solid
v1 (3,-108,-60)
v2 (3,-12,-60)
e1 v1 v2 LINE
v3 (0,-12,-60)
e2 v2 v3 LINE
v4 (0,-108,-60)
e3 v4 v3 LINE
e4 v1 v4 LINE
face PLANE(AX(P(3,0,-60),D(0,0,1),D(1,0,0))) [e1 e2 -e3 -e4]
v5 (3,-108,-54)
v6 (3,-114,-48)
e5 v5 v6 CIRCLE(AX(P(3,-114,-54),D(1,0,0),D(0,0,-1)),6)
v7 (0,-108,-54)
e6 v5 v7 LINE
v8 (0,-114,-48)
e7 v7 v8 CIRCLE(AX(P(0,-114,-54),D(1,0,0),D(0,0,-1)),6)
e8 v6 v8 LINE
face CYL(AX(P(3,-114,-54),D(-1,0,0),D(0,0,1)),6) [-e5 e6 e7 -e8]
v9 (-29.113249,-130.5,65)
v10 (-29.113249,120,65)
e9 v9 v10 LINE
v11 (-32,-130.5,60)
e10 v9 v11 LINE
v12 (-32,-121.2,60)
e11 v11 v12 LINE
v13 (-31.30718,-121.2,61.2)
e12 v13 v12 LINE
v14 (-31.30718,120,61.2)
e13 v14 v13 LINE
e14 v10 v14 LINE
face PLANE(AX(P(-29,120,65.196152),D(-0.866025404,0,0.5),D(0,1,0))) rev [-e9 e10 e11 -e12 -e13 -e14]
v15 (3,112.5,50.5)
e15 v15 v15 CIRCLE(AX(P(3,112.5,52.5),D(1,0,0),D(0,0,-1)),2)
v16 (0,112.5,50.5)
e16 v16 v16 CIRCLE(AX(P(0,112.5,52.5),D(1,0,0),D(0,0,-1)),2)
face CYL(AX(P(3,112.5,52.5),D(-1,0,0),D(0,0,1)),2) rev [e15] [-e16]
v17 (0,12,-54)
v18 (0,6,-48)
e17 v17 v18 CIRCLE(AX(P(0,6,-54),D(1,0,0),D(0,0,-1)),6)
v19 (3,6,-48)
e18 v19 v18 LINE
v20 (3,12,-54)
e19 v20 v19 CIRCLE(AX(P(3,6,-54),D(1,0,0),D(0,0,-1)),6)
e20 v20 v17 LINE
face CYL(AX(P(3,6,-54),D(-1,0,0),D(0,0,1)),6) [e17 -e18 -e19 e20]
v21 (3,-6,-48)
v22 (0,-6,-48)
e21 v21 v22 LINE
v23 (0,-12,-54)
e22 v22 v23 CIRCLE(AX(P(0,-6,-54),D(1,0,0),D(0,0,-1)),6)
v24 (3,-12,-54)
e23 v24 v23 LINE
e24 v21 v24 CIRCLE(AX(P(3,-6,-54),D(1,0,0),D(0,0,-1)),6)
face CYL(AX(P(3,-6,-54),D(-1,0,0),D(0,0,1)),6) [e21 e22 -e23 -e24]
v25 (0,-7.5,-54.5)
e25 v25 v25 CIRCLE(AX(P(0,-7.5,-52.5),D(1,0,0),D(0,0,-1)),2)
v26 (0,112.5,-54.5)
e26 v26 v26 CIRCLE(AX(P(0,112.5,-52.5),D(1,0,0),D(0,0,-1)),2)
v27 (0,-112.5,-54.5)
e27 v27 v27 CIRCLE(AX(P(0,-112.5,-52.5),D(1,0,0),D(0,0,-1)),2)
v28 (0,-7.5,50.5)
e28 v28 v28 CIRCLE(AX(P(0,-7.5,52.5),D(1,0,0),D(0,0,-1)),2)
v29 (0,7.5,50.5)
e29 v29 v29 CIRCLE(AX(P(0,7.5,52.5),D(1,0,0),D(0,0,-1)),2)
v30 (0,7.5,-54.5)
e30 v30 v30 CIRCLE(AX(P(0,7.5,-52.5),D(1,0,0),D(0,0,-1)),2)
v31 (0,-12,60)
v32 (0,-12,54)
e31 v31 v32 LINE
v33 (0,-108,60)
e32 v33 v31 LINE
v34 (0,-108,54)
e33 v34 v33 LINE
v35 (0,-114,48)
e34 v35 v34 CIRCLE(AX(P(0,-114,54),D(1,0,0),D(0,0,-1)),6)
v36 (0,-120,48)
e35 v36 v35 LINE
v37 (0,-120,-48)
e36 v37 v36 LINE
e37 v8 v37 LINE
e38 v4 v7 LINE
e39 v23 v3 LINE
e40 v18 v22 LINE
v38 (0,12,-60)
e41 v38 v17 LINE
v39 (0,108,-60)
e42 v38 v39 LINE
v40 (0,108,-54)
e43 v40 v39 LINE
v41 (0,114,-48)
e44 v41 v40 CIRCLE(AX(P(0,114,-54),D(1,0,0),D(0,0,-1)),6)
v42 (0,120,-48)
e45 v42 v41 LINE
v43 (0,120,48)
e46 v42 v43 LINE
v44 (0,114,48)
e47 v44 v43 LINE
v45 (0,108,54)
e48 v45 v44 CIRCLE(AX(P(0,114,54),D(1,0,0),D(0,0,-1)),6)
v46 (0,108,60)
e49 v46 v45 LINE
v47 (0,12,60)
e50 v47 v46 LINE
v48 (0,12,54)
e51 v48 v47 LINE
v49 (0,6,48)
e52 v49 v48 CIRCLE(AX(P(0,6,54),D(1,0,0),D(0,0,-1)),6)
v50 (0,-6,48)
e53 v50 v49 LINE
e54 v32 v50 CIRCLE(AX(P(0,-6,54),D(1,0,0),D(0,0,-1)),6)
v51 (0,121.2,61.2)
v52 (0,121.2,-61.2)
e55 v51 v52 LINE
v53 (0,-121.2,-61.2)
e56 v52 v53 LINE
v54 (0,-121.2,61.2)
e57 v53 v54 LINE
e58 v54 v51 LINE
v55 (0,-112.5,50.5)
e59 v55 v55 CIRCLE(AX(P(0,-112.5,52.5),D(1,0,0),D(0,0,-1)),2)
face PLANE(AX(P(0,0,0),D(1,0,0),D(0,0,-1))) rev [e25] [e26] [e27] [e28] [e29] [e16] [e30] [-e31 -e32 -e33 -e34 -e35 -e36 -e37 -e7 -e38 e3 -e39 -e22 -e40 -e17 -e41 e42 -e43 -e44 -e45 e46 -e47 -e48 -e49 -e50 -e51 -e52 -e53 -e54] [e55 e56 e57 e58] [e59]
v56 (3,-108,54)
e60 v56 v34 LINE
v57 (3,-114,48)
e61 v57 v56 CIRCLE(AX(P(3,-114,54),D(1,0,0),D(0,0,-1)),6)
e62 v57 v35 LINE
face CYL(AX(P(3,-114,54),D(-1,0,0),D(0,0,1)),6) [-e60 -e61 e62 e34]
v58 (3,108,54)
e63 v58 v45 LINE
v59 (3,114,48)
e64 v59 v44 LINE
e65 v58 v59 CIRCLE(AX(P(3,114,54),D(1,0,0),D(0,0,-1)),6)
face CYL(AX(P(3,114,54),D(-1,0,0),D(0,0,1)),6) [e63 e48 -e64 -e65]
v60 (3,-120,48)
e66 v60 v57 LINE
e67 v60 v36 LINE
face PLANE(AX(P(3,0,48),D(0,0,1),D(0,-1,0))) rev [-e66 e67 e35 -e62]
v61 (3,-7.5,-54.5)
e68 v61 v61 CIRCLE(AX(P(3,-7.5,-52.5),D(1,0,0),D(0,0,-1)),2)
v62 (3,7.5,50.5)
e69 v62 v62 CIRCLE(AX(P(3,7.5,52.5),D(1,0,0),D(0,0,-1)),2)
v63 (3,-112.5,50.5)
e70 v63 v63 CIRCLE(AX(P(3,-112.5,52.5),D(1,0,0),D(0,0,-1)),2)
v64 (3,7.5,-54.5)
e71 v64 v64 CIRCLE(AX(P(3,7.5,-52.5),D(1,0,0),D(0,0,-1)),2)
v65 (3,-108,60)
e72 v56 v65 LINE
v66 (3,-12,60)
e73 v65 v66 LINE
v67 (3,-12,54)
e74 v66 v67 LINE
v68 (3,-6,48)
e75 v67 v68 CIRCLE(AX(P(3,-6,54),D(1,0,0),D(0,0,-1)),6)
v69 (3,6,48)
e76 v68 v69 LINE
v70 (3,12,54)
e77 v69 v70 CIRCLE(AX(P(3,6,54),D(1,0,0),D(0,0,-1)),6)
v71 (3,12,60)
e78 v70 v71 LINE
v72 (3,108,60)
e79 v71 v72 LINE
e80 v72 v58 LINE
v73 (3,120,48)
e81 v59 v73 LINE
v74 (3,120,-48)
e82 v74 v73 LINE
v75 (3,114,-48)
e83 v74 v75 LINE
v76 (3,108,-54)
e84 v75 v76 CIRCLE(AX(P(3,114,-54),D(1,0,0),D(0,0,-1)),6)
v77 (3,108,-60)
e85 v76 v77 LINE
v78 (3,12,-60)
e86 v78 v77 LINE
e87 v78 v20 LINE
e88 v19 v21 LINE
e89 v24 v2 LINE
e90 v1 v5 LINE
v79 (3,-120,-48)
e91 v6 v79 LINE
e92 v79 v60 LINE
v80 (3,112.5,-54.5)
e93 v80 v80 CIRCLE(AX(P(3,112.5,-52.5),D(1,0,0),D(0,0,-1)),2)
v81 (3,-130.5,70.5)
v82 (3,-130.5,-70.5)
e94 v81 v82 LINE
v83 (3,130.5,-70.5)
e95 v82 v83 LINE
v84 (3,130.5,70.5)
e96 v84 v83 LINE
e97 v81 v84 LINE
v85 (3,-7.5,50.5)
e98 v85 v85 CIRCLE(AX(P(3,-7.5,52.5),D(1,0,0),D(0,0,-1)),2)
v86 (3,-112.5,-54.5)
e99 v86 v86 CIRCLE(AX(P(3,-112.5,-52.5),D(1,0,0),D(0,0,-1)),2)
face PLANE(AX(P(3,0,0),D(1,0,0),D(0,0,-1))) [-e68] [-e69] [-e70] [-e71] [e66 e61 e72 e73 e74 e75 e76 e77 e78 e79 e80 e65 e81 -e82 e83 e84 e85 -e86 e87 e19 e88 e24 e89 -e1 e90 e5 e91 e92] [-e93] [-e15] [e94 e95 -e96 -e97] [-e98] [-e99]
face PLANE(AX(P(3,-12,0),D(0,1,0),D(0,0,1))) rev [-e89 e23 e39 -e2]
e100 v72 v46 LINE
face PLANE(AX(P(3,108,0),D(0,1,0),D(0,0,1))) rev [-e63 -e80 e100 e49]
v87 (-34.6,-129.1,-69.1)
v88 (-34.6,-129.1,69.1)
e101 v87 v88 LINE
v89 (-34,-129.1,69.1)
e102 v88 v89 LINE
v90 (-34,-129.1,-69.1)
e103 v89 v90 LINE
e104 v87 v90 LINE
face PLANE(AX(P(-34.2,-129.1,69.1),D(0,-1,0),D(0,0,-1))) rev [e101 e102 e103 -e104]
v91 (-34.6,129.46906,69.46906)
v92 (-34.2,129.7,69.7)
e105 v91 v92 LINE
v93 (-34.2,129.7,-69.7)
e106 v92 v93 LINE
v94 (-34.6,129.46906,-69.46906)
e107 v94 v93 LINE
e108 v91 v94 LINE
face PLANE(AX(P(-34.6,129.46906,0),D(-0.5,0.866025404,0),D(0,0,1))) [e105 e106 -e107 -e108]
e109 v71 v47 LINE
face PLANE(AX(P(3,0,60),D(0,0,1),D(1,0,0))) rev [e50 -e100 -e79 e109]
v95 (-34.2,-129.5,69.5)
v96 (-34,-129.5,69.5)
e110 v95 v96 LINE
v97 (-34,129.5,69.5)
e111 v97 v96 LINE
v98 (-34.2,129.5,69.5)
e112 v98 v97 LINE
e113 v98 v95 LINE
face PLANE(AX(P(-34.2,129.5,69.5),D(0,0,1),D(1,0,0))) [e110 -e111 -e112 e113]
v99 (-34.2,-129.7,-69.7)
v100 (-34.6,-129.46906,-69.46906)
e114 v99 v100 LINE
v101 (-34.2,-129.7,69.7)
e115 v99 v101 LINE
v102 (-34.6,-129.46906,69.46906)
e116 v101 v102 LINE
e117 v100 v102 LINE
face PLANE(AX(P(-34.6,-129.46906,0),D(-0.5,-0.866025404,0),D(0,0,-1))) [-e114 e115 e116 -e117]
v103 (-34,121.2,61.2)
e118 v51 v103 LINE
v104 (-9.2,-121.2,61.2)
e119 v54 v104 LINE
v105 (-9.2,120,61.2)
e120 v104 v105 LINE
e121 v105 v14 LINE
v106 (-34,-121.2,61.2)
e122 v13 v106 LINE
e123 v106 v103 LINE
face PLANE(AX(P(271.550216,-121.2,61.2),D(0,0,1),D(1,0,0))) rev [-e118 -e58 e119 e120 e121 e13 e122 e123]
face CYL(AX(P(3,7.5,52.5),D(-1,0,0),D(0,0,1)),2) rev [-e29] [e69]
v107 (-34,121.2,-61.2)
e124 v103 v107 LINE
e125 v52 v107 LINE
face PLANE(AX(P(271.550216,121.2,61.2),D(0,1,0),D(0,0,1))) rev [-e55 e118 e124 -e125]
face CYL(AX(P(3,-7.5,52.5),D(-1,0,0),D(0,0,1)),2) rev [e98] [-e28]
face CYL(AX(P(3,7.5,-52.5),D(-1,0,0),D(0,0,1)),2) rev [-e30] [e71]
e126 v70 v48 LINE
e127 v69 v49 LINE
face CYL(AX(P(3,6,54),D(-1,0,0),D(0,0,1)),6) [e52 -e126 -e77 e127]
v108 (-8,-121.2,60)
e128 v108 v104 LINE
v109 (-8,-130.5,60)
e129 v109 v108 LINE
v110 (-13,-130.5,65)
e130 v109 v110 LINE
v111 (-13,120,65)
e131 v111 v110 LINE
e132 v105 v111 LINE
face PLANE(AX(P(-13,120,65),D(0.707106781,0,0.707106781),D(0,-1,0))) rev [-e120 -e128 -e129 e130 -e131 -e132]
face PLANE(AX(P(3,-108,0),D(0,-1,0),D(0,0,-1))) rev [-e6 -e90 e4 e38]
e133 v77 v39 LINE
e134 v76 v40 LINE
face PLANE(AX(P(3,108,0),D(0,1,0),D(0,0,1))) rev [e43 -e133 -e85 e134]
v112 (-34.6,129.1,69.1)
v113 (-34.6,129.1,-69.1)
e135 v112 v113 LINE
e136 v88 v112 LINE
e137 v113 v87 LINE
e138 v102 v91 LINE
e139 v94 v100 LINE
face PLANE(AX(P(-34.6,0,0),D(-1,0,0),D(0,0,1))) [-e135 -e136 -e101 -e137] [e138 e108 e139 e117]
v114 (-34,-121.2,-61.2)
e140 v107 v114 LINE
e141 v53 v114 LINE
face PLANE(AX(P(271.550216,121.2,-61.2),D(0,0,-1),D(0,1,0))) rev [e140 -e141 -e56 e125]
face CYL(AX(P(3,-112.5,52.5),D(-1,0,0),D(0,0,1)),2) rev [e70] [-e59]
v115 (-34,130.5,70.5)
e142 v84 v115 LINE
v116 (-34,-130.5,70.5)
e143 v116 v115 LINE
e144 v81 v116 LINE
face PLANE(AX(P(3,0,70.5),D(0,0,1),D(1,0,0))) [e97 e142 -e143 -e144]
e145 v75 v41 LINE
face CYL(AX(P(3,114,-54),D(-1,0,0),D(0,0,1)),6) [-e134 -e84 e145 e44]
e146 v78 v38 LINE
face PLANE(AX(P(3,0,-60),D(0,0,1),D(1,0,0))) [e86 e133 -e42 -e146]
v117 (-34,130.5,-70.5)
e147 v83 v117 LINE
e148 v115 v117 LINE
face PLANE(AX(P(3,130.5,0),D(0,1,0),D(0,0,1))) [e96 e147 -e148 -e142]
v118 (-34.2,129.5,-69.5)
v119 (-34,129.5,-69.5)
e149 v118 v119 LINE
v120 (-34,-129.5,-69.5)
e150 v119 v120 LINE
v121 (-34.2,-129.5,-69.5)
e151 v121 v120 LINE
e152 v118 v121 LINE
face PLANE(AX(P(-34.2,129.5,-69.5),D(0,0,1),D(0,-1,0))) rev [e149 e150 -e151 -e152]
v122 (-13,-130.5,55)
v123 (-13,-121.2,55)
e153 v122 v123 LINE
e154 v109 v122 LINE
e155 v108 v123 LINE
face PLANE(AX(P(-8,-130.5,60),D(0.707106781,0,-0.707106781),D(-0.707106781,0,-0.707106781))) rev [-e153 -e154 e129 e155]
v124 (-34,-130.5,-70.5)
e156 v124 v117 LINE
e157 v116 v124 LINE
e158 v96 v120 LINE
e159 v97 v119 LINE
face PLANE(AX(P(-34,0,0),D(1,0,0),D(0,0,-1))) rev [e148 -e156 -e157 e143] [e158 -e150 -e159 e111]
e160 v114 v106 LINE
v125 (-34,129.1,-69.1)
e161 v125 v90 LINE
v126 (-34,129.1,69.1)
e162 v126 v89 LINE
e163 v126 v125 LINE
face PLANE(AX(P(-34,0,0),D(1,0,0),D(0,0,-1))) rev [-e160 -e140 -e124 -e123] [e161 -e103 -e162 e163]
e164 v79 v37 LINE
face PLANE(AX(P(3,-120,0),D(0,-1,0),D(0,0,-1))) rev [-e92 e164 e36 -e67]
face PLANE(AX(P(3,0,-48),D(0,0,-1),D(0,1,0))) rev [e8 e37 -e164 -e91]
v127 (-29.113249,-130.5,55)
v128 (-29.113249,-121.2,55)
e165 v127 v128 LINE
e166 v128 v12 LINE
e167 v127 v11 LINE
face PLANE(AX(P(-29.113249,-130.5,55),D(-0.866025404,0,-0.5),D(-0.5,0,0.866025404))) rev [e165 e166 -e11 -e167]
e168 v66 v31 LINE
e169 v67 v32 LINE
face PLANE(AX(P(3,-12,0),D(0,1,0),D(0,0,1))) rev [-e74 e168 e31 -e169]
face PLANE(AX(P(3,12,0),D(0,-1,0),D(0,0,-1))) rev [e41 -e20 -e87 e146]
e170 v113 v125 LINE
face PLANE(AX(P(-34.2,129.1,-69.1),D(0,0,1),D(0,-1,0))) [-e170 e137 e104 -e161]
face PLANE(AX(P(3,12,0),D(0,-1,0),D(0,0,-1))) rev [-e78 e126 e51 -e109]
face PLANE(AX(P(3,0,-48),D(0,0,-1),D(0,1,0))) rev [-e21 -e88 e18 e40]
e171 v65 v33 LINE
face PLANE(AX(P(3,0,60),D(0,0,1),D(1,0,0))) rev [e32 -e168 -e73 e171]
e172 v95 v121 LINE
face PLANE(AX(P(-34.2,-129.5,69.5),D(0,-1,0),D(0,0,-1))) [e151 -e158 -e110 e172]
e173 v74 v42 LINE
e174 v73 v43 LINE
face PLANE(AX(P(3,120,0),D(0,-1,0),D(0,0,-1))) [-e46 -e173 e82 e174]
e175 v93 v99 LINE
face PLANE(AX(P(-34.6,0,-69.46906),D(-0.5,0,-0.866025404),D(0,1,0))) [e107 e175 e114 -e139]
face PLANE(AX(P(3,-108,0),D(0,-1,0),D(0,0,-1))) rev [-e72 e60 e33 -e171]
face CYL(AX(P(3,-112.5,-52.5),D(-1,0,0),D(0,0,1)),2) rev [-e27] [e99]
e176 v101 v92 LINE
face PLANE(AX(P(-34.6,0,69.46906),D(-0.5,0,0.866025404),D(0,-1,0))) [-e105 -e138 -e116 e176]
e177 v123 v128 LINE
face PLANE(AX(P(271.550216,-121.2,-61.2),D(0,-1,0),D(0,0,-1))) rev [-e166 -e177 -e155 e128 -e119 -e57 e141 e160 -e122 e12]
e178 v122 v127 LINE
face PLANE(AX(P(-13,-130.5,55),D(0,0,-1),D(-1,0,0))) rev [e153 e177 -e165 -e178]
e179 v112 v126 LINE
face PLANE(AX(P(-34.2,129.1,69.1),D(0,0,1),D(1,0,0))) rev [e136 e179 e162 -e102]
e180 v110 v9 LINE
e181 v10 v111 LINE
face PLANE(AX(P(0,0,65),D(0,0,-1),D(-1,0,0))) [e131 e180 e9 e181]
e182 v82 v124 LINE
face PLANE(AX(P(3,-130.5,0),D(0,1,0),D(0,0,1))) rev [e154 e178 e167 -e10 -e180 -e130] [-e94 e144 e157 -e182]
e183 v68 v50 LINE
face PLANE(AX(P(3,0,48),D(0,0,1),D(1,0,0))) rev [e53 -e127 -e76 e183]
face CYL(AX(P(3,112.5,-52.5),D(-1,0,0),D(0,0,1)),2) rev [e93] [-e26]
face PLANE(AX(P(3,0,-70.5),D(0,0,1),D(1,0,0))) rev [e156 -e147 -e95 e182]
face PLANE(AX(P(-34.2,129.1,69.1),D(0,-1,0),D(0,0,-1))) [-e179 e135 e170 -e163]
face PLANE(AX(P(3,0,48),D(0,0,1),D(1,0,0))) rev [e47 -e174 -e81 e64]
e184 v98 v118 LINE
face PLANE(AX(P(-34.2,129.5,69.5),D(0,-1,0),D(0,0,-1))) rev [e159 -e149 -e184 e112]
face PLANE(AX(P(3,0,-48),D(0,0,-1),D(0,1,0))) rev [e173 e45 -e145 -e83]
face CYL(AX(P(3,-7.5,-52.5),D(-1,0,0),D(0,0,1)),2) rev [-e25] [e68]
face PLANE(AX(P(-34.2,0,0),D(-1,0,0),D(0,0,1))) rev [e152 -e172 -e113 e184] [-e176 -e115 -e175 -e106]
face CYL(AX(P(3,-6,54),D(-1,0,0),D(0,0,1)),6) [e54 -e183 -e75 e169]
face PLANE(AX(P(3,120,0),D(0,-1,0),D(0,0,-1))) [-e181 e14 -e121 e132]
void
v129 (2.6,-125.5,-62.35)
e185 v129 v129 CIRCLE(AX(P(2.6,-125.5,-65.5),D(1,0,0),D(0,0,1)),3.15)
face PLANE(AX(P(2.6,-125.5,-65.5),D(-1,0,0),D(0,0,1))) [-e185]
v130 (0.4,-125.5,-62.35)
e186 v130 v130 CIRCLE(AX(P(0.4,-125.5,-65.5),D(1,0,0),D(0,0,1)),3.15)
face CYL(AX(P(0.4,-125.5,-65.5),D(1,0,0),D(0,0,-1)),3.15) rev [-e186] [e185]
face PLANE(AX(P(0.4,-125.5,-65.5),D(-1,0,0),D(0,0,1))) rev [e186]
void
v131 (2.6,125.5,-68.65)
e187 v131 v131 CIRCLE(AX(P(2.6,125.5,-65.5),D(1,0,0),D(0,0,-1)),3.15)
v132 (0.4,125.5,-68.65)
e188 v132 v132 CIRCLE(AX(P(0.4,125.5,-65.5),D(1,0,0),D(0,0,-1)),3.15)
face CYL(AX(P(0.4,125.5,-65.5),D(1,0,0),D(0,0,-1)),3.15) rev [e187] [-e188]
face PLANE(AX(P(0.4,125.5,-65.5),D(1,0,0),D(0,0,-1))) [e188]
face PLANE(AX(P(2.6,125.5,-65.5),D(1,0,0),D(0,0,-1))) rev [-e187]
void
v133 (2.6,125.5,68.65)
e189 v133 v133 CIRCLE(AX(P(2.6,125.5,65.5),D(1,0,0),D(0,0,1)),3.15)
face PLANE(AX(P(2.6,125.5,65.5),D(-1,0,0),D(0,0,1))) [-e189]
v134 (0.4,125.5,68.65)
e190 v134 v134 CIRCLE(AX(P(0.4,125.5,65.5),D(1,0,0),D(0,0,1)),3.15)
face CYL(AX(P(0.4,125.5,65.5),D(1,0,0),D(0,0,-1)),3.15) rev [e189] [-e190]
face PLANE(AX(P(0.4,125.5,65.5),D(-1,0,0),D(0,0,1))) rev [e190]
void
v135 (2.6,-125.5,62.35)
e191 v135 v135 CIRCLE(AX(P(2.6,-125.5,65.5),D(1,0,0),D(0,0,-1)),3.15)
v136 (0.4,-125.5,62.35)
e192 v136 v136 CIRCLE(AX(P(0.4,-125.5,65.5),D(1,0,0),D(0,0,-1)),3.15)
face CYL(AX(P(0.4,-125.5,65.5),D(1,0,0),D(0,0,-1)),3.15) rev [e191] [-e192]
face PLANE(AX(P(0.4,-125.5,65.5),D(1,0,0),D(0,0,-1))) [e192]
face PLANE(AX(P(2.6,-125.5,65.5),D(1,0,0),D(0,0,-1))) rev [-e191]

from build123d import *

# Parameters (mm, degrees)
SKETCH1_W                = 261
SKETCH1_H                = 141
SKETCH1_W_2              = 240
SKETCH1_H_2              = 120
SKETCH1_R                = 2
BOSS_EXTRUDE2_DEPTH      = 3
SKETCH1_6_W              = 261
SKETCH1_6_H              = 141
SKETCH1_6_W_2            = 240
SKETCH1_6_H_2            = 120
BOSS_EXTRUDE5_DEPTH      = 34
SKETCH14_W               = 259
SKETCH14_H               = 139
SKETCH14_W_2             = 258.2
SKETCH14_H_2             = 138.2
BOSS_EXTRUDE7_DEPTH      = 0.2
SKETCH17_W               = 259.4
SKETCH17_H               = 139.4
SKETCH17_W_2             = 258.2
SKETCH17_H_2             = 138.2
BOSS_EXTRUDE10_DEPTH     = 0.4
CHAMFER1_SIZE            = 0.4
CHAMFER1_SIZE_2          = 0.230940108
COVER_START              = -0.4
SKETCH18_R               = 3.15
COVER_MAGNET_HOLES_DEPTH = 2.2
SKETCH19_W               = 16
SKETCH19_H               = 240
CUT_EXTRUDE1_DEPTH       = 5
CHAMFER2_SIZE            = 3
CHAMFER2_SIZE_2          = 5.196152423
CHAMFER3_SIZE            = 5
CUT_EXTRUDE2_START       = -10.5
CUT_EXTRUDE2_DEPTH       = 11.5
CUT_EXTRUDE3_REACH       = 154.871
SKETCH21_W               = 242.4
SKETCH21_H               = 122.4


with BuildPart() as part:
    # Sketch1 → Boss-Extrude2 (new body)
    # profile 1 of 9: a face of its own
    with BuildSketch(Plane.YZ):
        Rectangle(SKETCH1_W, SKETCH1_H)
        Rectangle(SKETCH1_W_2, SKETCH1_H_2, mode=Mode.SUBTRACT)
    # profile 2 of 9: a face of its own
    with BuildSketch(Plane.YZ):
        with BuildLine():
            Line((-120, 60), (-120, 48))
            Line((-120, 48), (-114, 48))
            ThreePointArc((-114, 48), (-109.757359313, 49.757359313), (-108, 54))
            Line((-108, 54), (-108, 60))
            Line((-108, 60), (-120, 60))
        make_face()
        with Locations(Location((-112.5, 52.5, 0), (0, 0, 270))):
            Circle(SKETCH1_R, mode=Mode.SUBTRACT)
    # profile 3 of 9: a face of its own
    with BuildSketch(Plane.YZ):
        with BuildLine():
            Line((0, 60), (-12, 60))
            Line((-12, 60), (-12, 54))
            ThreePointArc((-12, 54), (-10.242640687, 49.757359313), (-6, 48))
            Line((-6, 48), (0, 48))
            Line((0, 48), (0, 60))
        make_face()
        with Locations(Location((-7.5, 52.5, 0), (0, 0, 270))):
            Circle(SKETCH1_R, mode=Mode.SUBTRACT)
    # profile 4 of 9: a face of its own
    with BuildSketch(Plane.YZ):
        with BuildLine():
            Line((12, 60), (0, 60))
            Line((0, 60), (0, 48))
            Line((0, 48), (6, 48))
            ThreePointArc((6, 48), (10.242640687, 49.757359313), (12, 54))
            Line((12, 54), (12, 60))
        make_face()
        with Locations(Location((7.5, 52.5, 0), (0, 0, 270))):
            Circle(SKETCH1_R, mode=Mode.SUBTRACT)
    # profile 5 of 9: a face of its own
    with BuildSketch(Plane.YZ):
        with BuildLine():
            Line((114, 48), (120, 48))
            Line((120, 48), (120, 60))
            Line((120, 60), (108, 60))
            Line((108, 60), (108, 54))
            ThreePointArc((108, 54), (109.757359313, 49.757359313), (114, 48))
        make_face()
        with Locations(Location((112.5, 52.5, 0), (0, 0, 270))):
            Circle(SKETCH1_R, mode=Mode.SUBTRACT)
    # profile 6 of 9: a face of its own
    with BuildSketch(Plane.YZ):
        with BuildLine():
            Line((108, -54), (108, -60))
            Line((108, -60), (120, -60))
            Line((120, -60), (120, -48))
            Line((120, -48), (114, -48))
            ThreePointArc((114, -48), (109.757359313, -49.757359313), (108, -54))
        make_face()
        with Locations(Location((112.5, -52.5, 0), (0, 0, 270))):
            Circle(SKETCH1_R, mode=Mode.SUBTRACT)
    # profile 7 of 9: a face of its own
    with BuildSketch(Plane.YZ):
        with BuildLine():
            Line((0, -48), (0, -60))
            Line((0, -60), (12, -60))
            Line((12, -60), (12, -54))
            ThreePointArc((12, -54), (10.242640687, -49.757359313), (6, -48))
            Line((6, -48), (0, -48))
        make_face()
        with Locations(Location((7.5, -52.5, 0), (0, 0, 270))):
            Circle(SKETCH1_R, mode=Mode.SUBTRACT)
    # profile 8 of 9: a face of its own
    with BuildSketch(Plane.YZ):
        with BuildLine():
            Line((-12, -54), (-12, -60))
            Line((-12, -60), (0, -60))
            Line((0, -60), (0, -48))
            Line((0, -48), (-6, -48))
            ThreePointArc((-6, -48), (-10.242640687, -49.757359313), (-12, -54))
        make_face()
        with Locations(Location((-7.5, -52.5, 0), (0, 0, 270))):
            Circle(SKETCH1_R, mode=Mode.SUBTRACT)
    # profile 9 of 9: a face of its own
    with BuildSketch(Plane.YZ):
        with BuildLine():
            Line((-120, -48), (-120, -60))
            Line((-120, -60), (-108, -60))
            Line((-108, -60), (-108, -54))
            ThreePointArc((-108, -54), (-109.757359313, -49.757359313), (-114, -48))
            Line((-114, -48), (-120, -48))
        make_face()
        with Locations(Location((-112.5, -52.5, 0), (0, 0, 270))):
            Circle(SKETCH1_R, mode=Mode.SUBTRACT)
    extrude(amount=BOSS_EXTRUDE2_DEPTH)

    # Sketch1<6> → Boss-Extrude5 (add)
    with BuildSketch(Plane.YZ):
        Rectangle(SKETCH1_6_W, SKETCH1_6_H)
        Rectangle(SKETCH1_6_W_2, SKETCH1_6_H_2, mode=Mode.SUBTRACT)
    extrude(amount=-BOSS_EXTRUDE5_DEPTH)

    # Sketch14 → Boss-Extrude7 (add)
    with BuildSketch(Plane(origin=(-34, 0, 0), x_dir=(0, -1, 0), z_dir=(-1, 0, 0))):
        Rectangle(SKETCH14_W, SKETCH14_H)
        Rectangle(SKETCH14_W_2, SKETCH14_H_2, mode=Mode.SUBTRACT)
    extrude(amount=BOSS_EXTRUDE7_DEPTH)

    # Sketch17 → Boss-Extrude10 (add)
    with BuildSketch(Plane(origin=(-34.2, 0, 0), x_dir=(0, -1, 0), z_dir=(-1, 0, 0))):
        Rectangle(SKETCH17_W, SKETCH17_H)
        Rectangle(SKETCH17_W_2, SKETCH17_H_2, mode=Mode.SUBTRACT)
    extrude(amount=BOSS_EXTRUDE10_DEPTH)

    # Chamfer1
    # the kernel refuses this chamfer: 0.4, 0.230940108 mm, written as the material it takes off along each edge
    with BuildSketch(Plane(origin=(-34.6, 130.734834302, -69.7), x_dir=(1, 0, 0), z_dir=(0, -1, 0))) as chamfer1_piece_1:
        Polygon((CHAMFER1_SIZE, 0), (0, CHAMFER1_SIZE_2 * 0.999999998596), (0, 0), align=None)
    extrude(amount=261.469668604, mode=Mode.SUBTRACT)
    with BuildSketch(Plane(origin=(-34.6, -129.7, -70.734834302), x_dir=(0, 1, 0), z_dir=(0, 0, 1)), Plane(origin=(-34.6, 129.7, 70.734834302), x_dir=(0, -1, 0), z_dir=(0, 0, -1))) as chamfer1_piece_2:
        Polygon((CHAMFER1_SIZE_2 * 0.999999998596, 0), (0, -CHAMFER1_SIZE), (0, 0), align=None)
    extrude(amount=141.469668604, mode=Mode.SUBTRACT)
    with BuildSketch(Plane(origin=(-34.6, -130.734834302, 69.7), x_dir=(0, 0, -1), z_dir=(0, 1, 0))) as chamfer1_piece_3:
        Polygon((CHAMFER1_SIZE_2 * 0.999999998596, 0), (0, -CHAMFER1_SIZE), (0, 0), align=None)
    extrude(amount=261.469668604, mode=Mode.SUBTRACT)

    # Sketch18 → Cover magnet holes (cut)
    with BuildSketch(Plane.YZ.offset(3).offset(COVER_START)):
        with Locations(Location((-125.5, 65.5, 0), (0, 0, 270))):
            Circle(SKETCH18_R)
        with Locations(Location((125.5, 65.5, 0), (0, 0, 90))):
            Circle(SKETCH18_R)
        with Locations(Location((125.5, -65.5, 0), (0, 0, 270))):
            Circle(SKETCH18_R)
        with Locations(Location((-125.5, -65.5, 0), (0, 0, 90))):
            Circle(SKETCH18_R)
    extrude(amount=-COVER_MAGNET_HOLES_DEPTH, mode=Mode.SUBTRACT)

    # Sketch19 → Cut-Extrude1 (cut)
    with BuildSketch(Plane(origin=(0, 0, 60), x_dir=(1, 0, 0), z_dir=(0, 0, -1))):
        with Locations((-21, 0)):
            Rectangle(SKETCH19_W, SKETCH19_H)
    extrude(amount=-CUT_EXTRUDE1_DEPTH, mode=Mode.SUBTRACT)

    # Chamfer2
    # the kernel refuses this chamfer: 5.196152423, 3 mm, written as the material it takes off along each edge
    with BuildSketch(Plane(origin=(-29, 120, 60), x_dir=(-1, 0, 0), z_dir=(0, -1, 0))) as chamfer2_piece_1_section:
        Polygon((CHAMFER2_SIZE, 0), (0, -CHAMFER2_SIZE_2), (0, 0), align=None)
    chamfer2_piece_1 = extrude(amount=240, mode=Mode.PRIVATE)
    chamfer2_piece_1 = split(chamfer2_piece_1, bisect_by=Plane(origin=(-29, 120, 65), z_dir=(0, 0, -1)), keep=Keep.TOP, mode=Mode.PRIVATE)
    add(chamfer2_piece_1, mode=Mode.SUBTRACT)

    # Chamfer3
    chamfer3_edges = [part.edges().sort_by_distance(p)[0] for p in [
        (-13, 0, 60),
    ]]
    chamfer(chamfer3_edges, length=CHAMFER3_SIZE - 0.0001)  # a hair under: the kernel refuses the full size

    # Cut-Extrude2: read off the stored shape, not the designer's step
    # Cut-Extrude2 outline → Cut-Extrude2 (cut)
    with BuildSketch(Plane(origin=(0, -120, 0), x_dir=(-1, 0, 0), z_dir=(0, 1, 0)).offset(CUT_EXTRUDE2_START)):
        Polygon((13, 65), (8, 60), (13, 55), (29.113248654, 55), (32, 60), (29.113248654, 65), align=None)
    extrude(amount=CUT_EXTRUDE2_DEPTH, mode=Mode.SUBTRACT)

    # Cut-Extrude3: up to this face of the body (flat: up to its plane)
    cut_extrude3_end = Plane(part.part.faces().sort_by_distance((0, 114.443379347, 54.443379347))[0])
    # Sketch21 → Cut-Extrude3 (cut, up to the picked face)
    with BuildSketch(Plane(origin=(-34, 0, 0), x_dir=(0, -1, 0), z_dir=(-1, 0, 0)), mode=Mode.PRIVATE) as cut_extrude3_sk1:
        Rectangle(SKETCH21_W, SKETCH21_H)
    cut_extrude3_tool1 = split(extrude(cut_extrude3_sk1.sketch, amount=-CUT_EXTRUDE3_REACH, mode=Mode.PRIVATE), bisect_by=cut_extrude3_end, keep=Keep.BOTH, mode=Mode.PRIVATE)
    add(cut_extrude3_tool1.solids().sort_by(Axis((-34, 0, 0), (1, 0, 0)))[0], mode=Mode.SUBTRACT)


solid = part.part
